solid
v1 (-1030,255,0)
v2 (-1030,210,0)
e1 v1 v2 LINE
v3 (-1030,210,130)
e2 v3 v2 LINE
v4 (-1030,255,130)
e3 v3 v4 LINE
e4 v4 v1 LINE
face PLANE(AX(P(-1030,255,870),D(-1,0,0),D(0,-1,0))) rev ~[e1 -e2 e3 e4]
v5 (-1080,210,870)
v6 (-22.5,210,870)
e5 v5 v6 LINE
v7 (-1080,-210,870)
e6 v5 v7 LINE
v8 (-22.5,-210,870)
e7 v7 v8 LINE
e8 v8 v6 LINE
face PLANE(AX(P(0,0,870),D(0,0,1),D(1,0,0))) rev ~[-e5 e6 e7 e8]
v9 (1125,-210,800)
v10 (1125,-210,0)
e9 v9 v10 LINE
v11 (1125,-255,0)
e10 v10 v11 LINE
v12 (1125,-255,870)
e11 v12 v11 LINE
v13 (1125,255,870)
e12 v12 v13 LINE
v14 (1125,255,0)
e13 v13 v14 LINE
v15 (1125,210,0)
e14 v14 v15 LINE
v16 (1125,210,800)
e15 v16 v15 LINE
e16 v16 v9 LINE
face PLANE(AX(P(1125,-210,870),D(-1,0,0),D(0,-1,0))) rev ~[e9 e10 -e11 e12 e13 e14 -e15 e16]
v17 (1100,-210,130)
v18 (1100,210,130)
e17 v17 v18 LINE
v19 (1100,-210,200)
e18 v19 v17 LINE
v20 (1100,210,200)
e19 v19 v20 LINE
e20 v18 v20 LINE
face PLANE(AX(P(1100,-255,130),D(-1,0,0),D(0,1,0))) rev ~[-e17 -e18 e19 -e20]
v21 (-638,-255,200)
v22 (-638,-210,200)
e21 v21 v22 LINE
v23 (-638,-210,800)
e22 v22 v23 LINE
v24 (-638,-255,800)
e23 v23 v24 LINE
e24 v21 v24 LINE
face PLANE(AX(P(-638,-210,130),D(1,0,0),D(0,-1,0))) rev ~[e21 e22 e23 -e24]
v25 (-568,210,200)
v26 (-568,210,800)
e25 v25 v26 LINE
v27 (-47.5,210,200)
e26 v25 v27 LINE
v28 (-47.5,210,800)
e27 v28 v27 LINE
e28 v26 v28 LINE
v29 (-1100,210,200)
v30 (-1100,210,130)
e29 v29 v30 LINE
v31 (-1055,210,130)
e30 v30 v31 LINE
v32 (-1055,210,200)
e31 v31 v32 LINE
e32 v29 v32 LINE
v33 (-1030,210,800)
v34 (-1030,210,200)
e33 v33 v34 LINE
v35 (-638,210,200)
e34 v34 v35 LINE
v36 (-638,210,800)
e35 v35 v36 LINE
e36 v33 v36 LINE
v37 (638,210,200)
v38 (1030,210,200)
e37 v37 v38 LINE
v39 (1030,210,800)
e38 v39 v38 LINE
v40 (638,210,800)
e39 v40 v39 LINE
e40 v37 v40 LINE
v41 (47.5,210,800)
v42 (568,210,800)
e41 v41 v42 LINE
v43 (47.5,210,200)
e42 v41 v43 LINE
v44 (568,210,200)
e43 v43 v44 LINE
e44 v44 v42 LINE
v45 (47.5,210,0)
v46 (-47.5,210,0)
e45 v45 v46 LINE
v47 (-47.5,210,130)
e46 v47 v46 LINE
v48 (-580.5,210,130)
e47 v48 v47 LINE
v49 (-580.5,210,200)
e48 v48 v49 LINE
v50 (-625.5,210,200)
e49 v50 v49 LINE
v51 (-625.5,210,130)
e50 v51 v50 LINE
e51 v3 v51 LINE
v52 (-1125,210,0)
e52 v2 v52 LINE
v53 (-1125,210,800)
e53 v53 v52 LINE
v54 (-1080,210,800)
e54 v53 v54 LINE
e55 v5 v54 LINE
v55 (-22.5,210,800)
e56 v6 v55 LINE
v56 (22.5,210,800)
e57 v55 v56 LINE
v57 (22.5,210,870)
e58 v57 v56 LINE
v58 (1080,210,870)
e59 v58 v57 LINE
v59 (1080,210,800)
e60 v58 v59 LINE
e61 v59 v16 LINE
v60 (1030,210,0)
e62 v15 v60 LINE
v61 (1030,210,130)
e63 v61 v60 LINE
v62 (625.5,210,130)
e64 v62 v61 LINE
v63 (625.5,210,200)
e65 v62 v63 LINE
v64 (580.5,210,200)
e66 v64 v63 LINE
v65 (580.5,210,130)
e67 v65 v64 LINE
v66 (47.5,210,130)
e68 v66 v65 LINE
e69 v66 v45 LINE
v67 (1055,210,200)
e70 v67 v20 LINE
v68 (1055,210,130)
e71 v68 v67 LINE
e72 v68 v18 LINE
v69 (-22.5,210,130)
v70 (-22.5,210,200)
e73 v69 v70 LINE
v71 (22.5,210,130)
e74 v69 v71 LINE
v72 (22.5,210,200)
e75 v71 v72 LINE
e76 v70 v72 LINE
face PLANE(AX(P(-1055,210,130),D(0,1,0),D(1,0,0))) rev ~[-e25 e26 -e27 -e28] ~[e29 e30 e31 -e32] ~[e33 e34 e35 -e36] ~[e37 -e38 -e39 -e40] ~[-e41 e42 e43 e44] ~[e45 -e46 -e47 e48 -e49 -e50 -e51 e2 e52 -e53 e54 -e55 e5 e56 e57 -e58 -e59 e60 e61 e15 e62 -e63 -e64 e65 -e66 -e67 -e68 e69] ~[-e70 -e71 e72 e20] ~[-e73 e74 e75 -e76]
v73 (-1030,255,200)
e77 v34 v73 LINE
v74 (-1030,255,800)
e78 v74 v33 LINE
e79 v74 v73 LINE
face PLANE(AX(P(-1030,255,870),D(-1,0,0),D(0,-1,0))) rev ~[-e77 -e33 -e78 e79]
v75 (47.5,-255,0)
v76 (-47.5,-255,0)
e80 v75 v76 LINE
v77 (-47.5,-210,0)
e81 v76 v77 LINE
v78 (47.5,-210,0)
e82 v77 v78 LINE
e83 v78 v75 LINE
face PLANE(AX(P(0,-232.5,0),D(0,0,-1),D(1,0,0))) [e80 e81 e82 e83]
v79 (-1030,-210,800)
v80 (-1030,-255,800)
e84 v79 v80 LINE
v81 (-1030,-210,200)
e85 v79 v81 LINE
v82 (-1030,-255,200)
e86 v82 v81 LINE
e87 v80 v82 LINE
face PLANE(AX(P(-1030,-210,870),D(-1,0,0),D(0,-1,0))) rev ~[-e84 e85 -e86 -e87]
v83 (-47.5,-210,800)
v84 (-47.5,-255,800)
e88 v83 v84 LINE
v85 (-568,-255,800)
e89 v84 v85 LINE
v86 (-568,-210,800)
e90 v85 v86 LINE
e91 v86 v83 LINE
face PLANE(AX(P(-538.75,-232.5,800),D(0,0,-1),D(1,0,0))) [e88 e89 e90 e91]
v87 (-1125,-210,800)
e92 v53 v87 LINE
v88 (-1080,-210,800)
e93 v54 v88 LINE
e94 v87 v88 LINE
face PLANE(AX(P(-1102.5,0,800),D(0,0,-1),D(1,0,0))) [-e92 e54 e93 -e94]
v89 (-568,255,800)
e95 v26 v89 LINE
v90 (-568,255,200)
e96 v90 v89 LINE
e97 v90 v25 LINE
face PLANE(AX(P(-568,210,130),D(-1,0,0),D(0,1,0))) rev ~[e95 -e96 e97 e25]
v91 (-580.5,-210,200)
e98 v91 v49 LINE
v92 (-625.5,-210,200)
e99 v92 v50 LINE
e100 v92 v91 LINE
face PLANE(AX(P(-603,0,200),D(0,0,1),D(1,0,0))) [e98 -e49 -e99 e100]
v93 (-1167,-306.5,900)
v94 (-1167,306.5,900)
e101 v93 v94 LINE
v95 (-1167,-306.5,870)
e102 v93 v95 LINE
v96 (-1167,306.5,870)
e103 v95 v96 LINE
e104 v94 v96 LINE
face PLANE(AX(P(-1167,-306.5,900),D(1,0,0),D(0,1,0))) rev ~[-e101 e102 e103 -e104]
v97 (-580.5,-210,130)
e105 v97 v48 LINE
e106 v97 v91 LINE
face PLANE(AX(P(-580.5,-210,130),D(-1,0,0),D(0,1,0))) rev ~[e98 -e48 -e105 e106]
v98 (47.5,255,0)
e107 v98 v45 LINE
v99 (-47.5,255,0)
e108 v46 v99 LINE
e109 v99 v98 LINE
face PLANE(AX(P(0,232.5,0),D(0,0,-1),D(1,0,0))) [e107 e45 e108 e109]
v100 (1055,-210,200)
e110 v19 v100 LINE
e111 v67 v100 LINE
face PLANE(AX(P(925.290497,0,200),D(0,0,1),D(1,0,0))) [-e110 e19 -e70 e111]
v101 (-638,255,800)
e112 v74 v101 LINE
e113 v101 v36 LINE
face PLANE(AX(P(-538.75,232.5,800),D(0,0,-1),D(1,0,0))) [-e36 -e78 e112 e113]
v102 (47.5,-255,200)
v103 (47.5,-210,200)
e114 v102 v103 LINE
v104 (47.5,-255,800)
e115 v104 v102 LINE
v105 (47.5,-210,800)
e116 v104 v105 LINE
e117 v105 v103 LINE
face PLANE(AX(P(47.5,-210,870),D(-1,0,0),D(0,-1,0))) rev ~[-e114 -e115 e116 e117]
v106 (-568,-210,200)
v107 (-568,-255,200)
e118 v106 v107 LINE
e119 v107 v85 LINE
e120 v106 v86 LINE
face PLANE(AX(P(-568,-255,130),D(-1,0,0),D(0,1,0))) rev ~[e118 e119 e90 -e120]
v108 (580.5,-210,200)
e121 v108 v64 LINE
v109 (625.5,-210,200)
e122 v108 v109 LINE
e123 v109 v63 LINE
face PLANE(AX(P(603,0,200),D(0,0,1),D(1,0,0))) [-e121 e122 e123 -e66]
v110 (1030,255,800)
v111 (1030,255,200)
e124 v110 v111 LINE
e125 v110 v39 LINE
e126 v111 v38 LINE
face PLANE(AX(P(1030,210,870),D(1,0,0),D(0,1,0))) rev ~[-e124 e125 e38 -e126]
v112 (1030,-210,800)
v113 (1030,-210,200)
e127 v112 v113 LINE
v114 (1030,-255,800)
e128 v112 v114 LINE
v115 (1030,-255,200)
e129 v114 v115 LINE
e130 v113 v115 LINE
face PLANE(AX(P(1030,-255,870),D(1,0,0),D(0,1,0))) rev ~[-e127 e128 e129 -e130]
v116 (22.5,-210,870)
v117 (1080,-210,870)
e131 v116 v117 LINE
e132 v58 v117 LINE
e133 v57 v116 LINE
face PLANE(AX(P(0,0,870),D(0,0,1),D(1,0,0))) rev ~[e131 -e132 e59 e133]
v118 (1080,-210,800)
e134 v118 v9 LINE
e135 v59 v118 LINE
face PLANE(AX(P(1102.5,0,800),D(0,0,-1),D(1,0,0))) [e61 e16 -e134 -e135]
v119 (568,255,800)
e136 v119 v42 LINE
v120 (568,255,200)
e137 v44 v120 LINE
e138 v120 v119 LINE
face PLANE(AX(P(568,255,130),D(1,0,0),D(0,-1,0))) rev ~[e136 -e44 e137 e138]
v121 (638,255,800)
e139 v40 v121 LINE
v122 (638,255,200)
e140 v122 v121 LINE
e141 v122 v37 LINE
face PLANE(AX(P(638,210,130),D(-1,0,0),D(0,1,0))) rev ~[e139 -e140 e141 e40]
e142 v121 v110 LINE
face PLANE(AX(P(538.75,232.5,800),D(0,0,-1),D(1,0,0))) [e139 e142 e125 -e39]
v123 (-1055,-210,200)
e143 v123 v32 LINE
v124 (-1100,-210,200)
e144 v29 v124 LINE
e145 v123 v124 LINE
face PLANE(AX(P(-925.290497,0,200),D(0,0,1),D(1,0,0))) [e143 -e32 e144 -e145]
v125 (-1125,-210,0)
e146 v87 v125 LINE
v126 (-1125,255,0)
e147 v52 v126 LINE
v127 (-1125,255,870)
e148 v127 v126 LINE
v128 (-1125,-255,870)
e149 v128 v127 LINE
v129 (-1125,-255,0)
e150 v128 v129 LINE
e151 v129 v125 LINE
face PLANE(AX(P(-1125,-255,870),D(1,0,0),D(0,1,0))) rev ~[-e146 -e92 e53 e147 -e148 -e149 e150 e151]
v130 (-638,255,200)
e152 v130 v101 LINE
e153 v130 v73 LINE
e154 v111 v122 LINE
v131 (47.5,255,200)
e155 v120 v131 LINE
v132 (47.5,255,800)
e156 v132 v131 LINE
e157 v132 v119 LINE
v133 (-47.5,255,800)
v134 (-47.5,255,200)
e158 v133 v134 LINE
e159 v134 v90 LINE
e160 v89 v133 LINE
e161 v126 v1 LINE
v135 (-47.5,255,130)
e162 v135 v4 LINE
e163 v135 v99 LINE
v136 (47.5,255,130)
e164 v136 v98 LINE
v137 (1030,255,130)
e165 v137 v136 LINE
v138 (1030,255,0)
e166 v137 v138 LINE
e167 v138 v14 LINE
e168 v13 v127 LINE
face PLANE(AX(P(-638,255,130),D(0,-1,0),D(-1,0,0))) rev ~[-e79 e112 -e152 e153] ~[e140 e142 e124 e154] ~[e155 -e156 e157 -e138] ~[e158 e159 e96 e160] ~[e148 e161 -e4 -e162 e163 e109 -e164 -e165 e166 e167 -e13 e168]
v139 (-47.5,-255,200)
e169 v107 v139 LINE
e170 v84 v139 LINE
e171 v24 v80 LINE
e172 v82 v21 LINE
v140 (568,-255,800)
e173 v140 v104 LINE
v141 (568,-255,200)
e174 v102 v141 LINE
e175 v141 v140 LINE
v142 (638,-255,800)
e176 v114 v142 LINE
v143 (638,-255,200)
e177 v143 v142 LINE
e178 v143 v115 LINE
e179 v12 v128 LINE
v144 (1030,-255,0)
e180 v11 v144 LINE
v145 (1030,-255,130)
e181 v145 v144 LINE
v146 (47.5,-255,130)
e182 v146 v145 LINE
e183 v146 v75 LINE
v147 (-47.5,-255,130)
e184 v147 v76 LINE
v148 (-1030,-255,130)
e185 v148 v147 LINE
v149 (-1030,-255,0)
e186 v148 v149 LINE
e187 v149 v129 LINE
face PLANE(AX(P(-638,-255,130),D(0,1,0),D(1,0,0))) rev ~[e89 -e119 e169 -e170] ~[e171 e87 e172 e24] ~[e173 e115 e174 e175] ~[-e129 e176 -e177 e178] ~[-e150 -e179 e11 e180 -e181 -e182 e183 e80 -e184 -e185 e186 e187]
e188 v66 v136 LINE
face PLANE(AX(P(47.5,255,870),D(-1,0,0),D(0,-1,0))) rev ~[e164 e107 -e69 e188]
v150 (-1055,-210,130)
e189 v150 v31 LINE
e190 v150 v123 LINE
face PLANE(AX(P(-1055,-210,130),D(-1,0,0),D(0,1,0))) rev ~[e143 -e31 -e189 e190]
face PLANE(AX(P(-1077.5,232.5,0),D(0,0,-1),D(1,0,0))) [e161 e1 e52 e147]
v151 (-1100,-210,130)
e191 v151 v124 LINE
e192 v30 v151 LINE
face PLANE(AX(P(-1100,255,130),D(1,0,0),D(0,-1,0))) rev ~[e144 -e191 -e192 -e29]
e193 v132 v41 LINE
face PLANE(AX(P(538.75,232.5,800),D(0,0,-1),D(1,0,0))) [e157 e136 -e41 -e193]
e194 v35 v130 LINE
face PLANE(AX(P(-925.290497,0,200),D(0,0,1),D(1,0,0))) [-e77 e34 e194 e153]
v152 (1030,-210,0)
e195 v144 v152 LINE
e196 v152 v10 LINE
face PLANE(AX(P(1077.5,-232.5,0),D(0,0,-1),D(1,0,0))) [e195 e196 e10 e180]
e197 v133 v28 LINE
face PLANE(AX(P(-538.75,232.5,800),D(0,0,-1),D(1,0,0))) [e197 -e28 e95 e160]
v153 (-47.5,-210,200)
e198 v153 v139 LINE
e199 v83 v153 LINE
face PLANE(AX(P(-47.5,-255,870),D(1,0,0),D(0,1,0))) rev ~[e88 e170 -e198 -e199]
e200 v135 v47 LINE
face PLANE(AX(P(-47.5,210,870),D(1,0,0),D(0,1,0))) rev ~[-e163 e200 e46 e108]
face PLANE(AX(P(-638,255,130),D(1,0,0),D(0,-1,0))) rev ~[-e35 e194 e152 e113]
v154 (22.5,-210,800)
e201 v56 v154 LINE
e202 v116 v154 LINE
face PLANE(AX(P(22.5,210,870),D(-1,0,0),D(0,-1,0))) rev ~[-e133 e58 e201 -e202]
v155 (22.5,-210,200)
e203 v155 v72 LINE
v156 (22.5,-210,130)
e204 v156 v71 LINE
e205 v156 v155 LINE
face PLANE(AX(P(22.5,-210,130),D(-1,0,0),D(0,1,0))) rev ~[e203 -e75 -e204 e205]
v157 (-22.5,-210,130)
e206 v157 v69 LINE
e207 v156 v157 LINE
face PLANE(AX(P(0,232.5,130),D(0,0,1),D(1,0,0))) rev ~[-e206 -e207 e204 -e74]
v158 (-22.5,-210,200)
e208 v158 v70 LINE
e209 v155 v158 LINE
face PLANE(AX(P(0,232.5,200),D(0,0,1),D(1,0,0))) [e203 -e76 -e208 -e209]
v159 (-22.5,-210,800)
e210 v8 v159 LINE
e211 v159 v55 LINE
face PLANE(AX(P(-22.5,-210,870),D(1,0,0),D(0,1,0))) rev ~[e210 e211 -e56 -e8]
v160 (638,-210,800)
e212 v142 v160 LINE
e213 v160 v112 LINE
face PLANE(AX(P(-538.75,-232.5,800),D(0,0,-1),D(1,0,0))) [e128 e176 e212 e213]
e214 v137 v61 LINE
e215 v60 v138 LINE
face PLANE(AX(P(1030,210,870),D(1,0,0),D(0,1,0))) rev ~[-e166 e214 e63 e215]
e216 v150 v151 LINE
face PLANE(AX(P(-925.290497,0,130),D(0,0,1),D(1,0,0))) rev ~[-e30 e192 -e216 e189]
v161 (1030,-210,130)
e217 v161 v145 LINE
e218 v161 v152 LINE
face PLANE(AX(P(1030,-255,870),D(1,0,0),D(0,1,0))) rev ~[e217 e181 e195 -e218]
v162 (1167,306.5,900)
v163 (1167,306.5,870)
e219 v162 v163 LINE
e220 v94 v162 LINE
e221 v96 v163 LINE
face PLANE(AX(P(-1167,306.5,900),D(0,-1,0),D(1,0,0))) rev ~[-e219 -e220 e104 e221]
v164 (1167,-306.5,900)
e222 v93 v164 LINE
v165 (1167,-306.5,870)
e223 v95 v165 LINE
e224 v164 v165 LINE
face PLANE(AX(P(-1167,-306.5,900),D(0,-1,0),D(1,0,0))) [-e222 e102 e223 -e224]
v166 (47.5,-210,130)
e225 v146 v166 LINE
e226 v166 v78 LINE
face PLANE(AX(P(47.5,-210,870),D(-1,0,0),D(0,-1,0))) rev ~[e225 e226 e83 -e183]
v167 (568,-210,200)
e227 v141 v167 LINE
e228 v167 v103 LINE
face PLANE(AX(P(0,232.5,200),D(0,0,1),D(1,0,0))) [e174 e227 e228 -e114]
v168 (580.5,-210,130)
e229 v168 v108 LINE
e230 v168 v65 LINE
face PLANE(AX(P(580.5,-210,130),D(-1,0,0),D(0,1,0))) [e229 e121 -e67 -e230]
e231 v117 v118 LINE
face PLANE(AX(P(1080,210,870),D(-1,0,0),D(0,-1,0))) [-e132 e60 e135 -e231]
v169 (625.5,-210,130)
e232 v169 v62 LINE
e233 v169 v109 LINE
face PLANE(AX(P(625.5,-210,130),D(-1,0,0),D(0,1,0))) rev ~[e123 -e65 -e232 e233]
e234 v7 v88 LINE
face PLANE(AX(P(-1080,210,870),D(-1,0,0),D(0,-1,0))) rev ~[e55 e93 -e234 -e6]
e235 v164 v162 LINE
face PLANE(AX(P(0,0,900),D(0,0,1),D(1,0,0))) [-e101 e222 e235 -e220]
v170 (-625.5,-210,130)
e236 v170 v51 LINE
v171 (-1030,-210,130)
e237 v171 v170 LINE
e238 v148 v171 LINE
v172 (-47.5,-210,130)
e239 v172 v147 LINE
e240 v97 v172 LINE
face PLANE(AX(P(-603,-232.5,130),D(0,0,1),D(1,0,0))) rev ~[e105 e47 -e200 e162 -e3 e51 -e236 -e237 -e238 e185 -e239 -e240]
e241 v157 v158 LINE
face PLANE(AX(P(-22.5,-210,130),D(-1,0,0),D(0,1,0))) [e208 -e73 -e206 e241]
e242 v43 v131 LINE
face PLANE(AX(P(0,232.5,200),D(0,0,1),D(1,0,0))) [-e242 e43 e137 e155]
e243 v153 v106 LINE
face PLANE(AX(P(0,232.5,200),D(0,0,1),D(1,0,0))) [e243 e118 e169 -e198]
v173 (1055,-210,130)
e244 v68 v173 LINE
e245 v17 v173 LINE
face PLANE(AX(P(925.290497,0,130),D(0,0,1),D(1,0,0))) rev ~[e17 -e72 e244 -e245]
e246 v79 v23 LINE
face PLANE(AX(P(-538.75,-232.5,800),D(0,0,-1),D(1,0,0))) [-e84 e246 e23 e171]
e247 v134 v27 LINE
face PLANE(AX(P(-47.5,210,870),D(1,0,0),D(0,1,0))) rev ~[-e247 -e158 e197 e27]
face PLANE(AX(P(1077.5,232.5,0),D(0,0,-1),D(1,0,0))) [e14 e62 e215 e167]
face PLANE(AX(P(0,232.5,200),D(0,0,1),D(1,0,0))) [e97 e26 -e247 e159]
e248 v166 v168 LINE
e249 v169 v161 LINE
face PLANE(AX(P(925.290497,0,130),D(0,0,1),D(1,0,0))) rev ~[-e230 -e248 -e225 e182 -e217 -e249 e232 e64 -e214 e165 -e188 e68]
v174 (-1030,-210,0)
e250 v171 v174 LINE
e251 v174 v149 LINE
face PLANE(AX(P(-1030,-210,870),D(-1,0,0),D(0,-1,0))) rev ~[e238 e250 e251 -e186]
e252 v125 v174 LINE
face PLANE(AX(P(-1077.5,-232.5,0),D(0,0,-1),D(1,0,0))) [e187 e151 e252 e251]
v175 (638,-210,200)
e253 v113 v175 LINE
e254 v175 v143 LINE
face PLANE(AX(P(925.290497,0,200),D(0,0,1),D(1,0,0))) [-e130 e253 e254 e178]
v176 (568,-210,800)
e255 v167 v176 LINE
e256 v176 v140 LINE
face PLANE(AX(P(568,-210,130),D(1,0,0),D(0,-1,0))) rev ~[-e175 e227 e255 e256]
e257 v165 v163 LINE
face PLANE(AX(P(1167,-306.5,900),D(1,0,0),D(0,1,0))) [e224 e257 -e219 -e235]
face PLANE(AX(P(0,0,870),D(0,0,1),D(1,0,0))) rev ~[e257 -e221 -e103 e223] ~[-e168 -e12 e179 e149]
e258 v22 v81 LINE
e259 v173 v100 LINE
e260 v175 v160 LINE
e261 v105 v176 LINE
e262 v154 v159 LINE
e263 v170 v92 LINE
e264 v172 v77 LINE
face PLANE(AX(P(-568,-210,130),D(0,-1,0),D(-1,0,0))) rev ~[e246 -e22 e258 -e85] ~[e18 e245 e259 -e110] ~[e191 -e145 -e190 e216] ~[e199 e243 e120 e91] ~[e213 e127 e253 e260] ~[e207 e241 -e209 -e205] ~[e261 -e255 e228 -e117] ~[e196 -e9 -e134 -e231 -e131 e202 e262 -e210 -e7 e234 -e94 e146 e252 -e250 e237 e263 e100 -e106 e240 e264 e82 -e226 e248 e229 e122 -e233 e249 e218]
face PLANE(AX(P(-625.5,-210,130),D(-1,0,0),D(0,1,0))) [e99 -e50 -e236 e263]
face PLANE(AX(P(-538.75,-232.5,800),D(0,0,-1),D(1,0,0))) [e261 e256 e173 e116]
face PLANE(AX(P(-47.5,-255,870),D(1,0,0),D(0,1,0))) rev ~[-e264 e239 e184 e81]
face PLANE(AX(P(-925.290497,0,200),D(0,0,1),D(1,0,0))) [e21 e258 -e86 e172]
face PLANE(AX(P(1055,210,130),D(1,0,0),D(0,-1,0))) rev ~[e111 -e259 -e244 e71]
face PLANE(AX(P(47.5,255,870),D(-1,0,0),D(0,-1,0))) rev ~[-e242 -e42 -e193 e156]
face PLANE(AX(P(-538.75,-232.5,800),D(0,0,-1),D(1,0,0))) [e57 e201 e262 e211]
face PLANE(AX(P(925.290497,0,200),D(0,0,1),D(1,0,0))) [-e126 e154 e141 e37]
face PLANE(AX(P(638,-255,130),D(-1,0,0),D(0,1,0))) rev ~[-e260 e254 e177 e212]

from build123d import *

# Parameters (mm, degrees)
F1_W      = 2334
F1_H      = 613
F2_DEPTH  = 30
F3_W      = 45
F3_H      = 420
F3_W_2    = 982.5
F3_H_2    = 45
F4_DEPTH  = 70
F5_DEPTH  = 870
F8_W      = 45
F8_H      = 420
F9_DEPTH  = 70
F10_DEPTH = 670
F11_DEPTH = 70


# Not quite as in the source:
# - a feature names something its author has since deleted; it is built from what else it names


with BuildPart() as f2:
    # F1 (on offset) → F2 (new body)
    with BuildSketch(Plane.XY.offset(900)):
        Rectangle(F1_W, F1_H)
    extrude(amount=-F2_DEPTH)

    # F3 (on face) → F4 (join)
    with BuildSketch(Plane(origin=(0, 0, 870), x_dir=(1, 0, 0), z_dir=(0, 0, -1))):
        with Locations((-1102.5, 0)):
            Rectangle(F3_W, F3_H)
        with Locations((1102.5, 0)):
            Rectangle(F3_W, F3_H)
        with Locations((-538.75, 232.5)):
            Rectangle(F3_W_2, F3_H_2)
        with Locations((-538.75, -232.5)):
            Rectangle(F3_W_2, F3_H_2)
        Polygon((47.5, 255), (-47.5, 255), (-47.5, 210), (-22.5, 210), (22.5, 210), (47.5, 210), align=None)
        with Locations((538.75, 232.5)):
            Rectangle(F3_W_2, F3_H_2)
        Polygon((22.5, 210), (-22.5, 210), (-22.5, -210), (22.5, -210), (22.5, -47.5), (22.5, 47.5), align=None)
        with Locations((538.75, -232.5)):
            Rectangle(F3_W_2, F3_H_2)
    extrude(amount=F4_DEPTH)

    # F3 (on face) → F5 (join)
    with BuildSketch(Plane(origin=(0, 0, 870), x_dir=(1, 0, 0), z_dir=(0, 0, -1))):
        Polygon((-1030, 255), (-1125, 255), (-1125, 210), (-1080, 210), (-1030, 210), align=None)
        Polygon((47.5, 255), (-47.5, 255), (-47.5, 210), (-22.5, 210), (22.5, 210), (47.5, 210), align=None)
        Polygon((-1080, -210), (-1125, -210), (-1125, -255), (-1030, -255), (-1030, -210), align=None)
        Polygon((1125, 255), (1030, 255), (1030, 210), (1080, 210), (1125, 210), align=None)
        Polygon((22.5, -210), (-22.5, -210), (-47.5, -210), (-47.5, -255), (47.5, -255), (47.5, -210), align=None)
        Polygon((1125, -255), (1125, -210), (1080, -210), (1030, -210), (1030, -255), align=None)
    extrude(amount=F5_DEPTH)

    # F8 (on offset) → F9 (join)
    with BuildSketch(Plane.XY.offset(130)):
        Polygon((-638, 210), (-638, 255), (-1100, 255), (-1100, -255), (-638, -255), (-638, -210), (-1055, -210), (-1055, 210), align=None)
        Polygon((568, 210), (568, 255), (-568, 255), (-568, 210), (-22.5, 210), (22.5, 210), align=None)
        Polygon((-568, -255), (568, -255), (568, -210), (22.5, -210), (-22.5, -210), (-568, -210), align=None)
        Rectangle(F8_W, F8_H)
        Polygon((1100, -255), (1100, 255), (638, 255), (638, 210), (1055, 210), (1055, -210), (638, -210), (638, -255), align=None)
    extrude(amount=F9_DEPTH)

    # F8 (on offset) → F10 (join, through all)
    with BuildSketch(Plane.XY.offset(130)):
        Polygon((-638, -255), (-568, -255), (-568, -210), (-580.5, -210), (-625.5, -210), (-638, -210), align=None)
        Polygon((-568, 210), (-568, 255), (-638, 255), (-638, 210), (-625.5, 210), (-580.5, 210), align=None)
        Polygon((638, 210), (638, 255), (568, 255), (568, 210), (580.5, 210), (625.5, 210), align=None)
        Polygon((568, -255), (638, -255), (638, -210), (625.5, -210), (580.5, -210), (568, -210), align=None)
    extrude(amount=F10_DEPTH)

    # F8 (on offset) → F11 (join)
    with BuildSketch(Plane.XY.offset(130)):
        with Locations((-603, 0)):
            Rectangle(F8_W, F8_H)
        with Locations((603, 0)):
            Rectangle(F8_W, F8_H)
    extrude(amount=F11_DEPTH)


solid = f2.part
